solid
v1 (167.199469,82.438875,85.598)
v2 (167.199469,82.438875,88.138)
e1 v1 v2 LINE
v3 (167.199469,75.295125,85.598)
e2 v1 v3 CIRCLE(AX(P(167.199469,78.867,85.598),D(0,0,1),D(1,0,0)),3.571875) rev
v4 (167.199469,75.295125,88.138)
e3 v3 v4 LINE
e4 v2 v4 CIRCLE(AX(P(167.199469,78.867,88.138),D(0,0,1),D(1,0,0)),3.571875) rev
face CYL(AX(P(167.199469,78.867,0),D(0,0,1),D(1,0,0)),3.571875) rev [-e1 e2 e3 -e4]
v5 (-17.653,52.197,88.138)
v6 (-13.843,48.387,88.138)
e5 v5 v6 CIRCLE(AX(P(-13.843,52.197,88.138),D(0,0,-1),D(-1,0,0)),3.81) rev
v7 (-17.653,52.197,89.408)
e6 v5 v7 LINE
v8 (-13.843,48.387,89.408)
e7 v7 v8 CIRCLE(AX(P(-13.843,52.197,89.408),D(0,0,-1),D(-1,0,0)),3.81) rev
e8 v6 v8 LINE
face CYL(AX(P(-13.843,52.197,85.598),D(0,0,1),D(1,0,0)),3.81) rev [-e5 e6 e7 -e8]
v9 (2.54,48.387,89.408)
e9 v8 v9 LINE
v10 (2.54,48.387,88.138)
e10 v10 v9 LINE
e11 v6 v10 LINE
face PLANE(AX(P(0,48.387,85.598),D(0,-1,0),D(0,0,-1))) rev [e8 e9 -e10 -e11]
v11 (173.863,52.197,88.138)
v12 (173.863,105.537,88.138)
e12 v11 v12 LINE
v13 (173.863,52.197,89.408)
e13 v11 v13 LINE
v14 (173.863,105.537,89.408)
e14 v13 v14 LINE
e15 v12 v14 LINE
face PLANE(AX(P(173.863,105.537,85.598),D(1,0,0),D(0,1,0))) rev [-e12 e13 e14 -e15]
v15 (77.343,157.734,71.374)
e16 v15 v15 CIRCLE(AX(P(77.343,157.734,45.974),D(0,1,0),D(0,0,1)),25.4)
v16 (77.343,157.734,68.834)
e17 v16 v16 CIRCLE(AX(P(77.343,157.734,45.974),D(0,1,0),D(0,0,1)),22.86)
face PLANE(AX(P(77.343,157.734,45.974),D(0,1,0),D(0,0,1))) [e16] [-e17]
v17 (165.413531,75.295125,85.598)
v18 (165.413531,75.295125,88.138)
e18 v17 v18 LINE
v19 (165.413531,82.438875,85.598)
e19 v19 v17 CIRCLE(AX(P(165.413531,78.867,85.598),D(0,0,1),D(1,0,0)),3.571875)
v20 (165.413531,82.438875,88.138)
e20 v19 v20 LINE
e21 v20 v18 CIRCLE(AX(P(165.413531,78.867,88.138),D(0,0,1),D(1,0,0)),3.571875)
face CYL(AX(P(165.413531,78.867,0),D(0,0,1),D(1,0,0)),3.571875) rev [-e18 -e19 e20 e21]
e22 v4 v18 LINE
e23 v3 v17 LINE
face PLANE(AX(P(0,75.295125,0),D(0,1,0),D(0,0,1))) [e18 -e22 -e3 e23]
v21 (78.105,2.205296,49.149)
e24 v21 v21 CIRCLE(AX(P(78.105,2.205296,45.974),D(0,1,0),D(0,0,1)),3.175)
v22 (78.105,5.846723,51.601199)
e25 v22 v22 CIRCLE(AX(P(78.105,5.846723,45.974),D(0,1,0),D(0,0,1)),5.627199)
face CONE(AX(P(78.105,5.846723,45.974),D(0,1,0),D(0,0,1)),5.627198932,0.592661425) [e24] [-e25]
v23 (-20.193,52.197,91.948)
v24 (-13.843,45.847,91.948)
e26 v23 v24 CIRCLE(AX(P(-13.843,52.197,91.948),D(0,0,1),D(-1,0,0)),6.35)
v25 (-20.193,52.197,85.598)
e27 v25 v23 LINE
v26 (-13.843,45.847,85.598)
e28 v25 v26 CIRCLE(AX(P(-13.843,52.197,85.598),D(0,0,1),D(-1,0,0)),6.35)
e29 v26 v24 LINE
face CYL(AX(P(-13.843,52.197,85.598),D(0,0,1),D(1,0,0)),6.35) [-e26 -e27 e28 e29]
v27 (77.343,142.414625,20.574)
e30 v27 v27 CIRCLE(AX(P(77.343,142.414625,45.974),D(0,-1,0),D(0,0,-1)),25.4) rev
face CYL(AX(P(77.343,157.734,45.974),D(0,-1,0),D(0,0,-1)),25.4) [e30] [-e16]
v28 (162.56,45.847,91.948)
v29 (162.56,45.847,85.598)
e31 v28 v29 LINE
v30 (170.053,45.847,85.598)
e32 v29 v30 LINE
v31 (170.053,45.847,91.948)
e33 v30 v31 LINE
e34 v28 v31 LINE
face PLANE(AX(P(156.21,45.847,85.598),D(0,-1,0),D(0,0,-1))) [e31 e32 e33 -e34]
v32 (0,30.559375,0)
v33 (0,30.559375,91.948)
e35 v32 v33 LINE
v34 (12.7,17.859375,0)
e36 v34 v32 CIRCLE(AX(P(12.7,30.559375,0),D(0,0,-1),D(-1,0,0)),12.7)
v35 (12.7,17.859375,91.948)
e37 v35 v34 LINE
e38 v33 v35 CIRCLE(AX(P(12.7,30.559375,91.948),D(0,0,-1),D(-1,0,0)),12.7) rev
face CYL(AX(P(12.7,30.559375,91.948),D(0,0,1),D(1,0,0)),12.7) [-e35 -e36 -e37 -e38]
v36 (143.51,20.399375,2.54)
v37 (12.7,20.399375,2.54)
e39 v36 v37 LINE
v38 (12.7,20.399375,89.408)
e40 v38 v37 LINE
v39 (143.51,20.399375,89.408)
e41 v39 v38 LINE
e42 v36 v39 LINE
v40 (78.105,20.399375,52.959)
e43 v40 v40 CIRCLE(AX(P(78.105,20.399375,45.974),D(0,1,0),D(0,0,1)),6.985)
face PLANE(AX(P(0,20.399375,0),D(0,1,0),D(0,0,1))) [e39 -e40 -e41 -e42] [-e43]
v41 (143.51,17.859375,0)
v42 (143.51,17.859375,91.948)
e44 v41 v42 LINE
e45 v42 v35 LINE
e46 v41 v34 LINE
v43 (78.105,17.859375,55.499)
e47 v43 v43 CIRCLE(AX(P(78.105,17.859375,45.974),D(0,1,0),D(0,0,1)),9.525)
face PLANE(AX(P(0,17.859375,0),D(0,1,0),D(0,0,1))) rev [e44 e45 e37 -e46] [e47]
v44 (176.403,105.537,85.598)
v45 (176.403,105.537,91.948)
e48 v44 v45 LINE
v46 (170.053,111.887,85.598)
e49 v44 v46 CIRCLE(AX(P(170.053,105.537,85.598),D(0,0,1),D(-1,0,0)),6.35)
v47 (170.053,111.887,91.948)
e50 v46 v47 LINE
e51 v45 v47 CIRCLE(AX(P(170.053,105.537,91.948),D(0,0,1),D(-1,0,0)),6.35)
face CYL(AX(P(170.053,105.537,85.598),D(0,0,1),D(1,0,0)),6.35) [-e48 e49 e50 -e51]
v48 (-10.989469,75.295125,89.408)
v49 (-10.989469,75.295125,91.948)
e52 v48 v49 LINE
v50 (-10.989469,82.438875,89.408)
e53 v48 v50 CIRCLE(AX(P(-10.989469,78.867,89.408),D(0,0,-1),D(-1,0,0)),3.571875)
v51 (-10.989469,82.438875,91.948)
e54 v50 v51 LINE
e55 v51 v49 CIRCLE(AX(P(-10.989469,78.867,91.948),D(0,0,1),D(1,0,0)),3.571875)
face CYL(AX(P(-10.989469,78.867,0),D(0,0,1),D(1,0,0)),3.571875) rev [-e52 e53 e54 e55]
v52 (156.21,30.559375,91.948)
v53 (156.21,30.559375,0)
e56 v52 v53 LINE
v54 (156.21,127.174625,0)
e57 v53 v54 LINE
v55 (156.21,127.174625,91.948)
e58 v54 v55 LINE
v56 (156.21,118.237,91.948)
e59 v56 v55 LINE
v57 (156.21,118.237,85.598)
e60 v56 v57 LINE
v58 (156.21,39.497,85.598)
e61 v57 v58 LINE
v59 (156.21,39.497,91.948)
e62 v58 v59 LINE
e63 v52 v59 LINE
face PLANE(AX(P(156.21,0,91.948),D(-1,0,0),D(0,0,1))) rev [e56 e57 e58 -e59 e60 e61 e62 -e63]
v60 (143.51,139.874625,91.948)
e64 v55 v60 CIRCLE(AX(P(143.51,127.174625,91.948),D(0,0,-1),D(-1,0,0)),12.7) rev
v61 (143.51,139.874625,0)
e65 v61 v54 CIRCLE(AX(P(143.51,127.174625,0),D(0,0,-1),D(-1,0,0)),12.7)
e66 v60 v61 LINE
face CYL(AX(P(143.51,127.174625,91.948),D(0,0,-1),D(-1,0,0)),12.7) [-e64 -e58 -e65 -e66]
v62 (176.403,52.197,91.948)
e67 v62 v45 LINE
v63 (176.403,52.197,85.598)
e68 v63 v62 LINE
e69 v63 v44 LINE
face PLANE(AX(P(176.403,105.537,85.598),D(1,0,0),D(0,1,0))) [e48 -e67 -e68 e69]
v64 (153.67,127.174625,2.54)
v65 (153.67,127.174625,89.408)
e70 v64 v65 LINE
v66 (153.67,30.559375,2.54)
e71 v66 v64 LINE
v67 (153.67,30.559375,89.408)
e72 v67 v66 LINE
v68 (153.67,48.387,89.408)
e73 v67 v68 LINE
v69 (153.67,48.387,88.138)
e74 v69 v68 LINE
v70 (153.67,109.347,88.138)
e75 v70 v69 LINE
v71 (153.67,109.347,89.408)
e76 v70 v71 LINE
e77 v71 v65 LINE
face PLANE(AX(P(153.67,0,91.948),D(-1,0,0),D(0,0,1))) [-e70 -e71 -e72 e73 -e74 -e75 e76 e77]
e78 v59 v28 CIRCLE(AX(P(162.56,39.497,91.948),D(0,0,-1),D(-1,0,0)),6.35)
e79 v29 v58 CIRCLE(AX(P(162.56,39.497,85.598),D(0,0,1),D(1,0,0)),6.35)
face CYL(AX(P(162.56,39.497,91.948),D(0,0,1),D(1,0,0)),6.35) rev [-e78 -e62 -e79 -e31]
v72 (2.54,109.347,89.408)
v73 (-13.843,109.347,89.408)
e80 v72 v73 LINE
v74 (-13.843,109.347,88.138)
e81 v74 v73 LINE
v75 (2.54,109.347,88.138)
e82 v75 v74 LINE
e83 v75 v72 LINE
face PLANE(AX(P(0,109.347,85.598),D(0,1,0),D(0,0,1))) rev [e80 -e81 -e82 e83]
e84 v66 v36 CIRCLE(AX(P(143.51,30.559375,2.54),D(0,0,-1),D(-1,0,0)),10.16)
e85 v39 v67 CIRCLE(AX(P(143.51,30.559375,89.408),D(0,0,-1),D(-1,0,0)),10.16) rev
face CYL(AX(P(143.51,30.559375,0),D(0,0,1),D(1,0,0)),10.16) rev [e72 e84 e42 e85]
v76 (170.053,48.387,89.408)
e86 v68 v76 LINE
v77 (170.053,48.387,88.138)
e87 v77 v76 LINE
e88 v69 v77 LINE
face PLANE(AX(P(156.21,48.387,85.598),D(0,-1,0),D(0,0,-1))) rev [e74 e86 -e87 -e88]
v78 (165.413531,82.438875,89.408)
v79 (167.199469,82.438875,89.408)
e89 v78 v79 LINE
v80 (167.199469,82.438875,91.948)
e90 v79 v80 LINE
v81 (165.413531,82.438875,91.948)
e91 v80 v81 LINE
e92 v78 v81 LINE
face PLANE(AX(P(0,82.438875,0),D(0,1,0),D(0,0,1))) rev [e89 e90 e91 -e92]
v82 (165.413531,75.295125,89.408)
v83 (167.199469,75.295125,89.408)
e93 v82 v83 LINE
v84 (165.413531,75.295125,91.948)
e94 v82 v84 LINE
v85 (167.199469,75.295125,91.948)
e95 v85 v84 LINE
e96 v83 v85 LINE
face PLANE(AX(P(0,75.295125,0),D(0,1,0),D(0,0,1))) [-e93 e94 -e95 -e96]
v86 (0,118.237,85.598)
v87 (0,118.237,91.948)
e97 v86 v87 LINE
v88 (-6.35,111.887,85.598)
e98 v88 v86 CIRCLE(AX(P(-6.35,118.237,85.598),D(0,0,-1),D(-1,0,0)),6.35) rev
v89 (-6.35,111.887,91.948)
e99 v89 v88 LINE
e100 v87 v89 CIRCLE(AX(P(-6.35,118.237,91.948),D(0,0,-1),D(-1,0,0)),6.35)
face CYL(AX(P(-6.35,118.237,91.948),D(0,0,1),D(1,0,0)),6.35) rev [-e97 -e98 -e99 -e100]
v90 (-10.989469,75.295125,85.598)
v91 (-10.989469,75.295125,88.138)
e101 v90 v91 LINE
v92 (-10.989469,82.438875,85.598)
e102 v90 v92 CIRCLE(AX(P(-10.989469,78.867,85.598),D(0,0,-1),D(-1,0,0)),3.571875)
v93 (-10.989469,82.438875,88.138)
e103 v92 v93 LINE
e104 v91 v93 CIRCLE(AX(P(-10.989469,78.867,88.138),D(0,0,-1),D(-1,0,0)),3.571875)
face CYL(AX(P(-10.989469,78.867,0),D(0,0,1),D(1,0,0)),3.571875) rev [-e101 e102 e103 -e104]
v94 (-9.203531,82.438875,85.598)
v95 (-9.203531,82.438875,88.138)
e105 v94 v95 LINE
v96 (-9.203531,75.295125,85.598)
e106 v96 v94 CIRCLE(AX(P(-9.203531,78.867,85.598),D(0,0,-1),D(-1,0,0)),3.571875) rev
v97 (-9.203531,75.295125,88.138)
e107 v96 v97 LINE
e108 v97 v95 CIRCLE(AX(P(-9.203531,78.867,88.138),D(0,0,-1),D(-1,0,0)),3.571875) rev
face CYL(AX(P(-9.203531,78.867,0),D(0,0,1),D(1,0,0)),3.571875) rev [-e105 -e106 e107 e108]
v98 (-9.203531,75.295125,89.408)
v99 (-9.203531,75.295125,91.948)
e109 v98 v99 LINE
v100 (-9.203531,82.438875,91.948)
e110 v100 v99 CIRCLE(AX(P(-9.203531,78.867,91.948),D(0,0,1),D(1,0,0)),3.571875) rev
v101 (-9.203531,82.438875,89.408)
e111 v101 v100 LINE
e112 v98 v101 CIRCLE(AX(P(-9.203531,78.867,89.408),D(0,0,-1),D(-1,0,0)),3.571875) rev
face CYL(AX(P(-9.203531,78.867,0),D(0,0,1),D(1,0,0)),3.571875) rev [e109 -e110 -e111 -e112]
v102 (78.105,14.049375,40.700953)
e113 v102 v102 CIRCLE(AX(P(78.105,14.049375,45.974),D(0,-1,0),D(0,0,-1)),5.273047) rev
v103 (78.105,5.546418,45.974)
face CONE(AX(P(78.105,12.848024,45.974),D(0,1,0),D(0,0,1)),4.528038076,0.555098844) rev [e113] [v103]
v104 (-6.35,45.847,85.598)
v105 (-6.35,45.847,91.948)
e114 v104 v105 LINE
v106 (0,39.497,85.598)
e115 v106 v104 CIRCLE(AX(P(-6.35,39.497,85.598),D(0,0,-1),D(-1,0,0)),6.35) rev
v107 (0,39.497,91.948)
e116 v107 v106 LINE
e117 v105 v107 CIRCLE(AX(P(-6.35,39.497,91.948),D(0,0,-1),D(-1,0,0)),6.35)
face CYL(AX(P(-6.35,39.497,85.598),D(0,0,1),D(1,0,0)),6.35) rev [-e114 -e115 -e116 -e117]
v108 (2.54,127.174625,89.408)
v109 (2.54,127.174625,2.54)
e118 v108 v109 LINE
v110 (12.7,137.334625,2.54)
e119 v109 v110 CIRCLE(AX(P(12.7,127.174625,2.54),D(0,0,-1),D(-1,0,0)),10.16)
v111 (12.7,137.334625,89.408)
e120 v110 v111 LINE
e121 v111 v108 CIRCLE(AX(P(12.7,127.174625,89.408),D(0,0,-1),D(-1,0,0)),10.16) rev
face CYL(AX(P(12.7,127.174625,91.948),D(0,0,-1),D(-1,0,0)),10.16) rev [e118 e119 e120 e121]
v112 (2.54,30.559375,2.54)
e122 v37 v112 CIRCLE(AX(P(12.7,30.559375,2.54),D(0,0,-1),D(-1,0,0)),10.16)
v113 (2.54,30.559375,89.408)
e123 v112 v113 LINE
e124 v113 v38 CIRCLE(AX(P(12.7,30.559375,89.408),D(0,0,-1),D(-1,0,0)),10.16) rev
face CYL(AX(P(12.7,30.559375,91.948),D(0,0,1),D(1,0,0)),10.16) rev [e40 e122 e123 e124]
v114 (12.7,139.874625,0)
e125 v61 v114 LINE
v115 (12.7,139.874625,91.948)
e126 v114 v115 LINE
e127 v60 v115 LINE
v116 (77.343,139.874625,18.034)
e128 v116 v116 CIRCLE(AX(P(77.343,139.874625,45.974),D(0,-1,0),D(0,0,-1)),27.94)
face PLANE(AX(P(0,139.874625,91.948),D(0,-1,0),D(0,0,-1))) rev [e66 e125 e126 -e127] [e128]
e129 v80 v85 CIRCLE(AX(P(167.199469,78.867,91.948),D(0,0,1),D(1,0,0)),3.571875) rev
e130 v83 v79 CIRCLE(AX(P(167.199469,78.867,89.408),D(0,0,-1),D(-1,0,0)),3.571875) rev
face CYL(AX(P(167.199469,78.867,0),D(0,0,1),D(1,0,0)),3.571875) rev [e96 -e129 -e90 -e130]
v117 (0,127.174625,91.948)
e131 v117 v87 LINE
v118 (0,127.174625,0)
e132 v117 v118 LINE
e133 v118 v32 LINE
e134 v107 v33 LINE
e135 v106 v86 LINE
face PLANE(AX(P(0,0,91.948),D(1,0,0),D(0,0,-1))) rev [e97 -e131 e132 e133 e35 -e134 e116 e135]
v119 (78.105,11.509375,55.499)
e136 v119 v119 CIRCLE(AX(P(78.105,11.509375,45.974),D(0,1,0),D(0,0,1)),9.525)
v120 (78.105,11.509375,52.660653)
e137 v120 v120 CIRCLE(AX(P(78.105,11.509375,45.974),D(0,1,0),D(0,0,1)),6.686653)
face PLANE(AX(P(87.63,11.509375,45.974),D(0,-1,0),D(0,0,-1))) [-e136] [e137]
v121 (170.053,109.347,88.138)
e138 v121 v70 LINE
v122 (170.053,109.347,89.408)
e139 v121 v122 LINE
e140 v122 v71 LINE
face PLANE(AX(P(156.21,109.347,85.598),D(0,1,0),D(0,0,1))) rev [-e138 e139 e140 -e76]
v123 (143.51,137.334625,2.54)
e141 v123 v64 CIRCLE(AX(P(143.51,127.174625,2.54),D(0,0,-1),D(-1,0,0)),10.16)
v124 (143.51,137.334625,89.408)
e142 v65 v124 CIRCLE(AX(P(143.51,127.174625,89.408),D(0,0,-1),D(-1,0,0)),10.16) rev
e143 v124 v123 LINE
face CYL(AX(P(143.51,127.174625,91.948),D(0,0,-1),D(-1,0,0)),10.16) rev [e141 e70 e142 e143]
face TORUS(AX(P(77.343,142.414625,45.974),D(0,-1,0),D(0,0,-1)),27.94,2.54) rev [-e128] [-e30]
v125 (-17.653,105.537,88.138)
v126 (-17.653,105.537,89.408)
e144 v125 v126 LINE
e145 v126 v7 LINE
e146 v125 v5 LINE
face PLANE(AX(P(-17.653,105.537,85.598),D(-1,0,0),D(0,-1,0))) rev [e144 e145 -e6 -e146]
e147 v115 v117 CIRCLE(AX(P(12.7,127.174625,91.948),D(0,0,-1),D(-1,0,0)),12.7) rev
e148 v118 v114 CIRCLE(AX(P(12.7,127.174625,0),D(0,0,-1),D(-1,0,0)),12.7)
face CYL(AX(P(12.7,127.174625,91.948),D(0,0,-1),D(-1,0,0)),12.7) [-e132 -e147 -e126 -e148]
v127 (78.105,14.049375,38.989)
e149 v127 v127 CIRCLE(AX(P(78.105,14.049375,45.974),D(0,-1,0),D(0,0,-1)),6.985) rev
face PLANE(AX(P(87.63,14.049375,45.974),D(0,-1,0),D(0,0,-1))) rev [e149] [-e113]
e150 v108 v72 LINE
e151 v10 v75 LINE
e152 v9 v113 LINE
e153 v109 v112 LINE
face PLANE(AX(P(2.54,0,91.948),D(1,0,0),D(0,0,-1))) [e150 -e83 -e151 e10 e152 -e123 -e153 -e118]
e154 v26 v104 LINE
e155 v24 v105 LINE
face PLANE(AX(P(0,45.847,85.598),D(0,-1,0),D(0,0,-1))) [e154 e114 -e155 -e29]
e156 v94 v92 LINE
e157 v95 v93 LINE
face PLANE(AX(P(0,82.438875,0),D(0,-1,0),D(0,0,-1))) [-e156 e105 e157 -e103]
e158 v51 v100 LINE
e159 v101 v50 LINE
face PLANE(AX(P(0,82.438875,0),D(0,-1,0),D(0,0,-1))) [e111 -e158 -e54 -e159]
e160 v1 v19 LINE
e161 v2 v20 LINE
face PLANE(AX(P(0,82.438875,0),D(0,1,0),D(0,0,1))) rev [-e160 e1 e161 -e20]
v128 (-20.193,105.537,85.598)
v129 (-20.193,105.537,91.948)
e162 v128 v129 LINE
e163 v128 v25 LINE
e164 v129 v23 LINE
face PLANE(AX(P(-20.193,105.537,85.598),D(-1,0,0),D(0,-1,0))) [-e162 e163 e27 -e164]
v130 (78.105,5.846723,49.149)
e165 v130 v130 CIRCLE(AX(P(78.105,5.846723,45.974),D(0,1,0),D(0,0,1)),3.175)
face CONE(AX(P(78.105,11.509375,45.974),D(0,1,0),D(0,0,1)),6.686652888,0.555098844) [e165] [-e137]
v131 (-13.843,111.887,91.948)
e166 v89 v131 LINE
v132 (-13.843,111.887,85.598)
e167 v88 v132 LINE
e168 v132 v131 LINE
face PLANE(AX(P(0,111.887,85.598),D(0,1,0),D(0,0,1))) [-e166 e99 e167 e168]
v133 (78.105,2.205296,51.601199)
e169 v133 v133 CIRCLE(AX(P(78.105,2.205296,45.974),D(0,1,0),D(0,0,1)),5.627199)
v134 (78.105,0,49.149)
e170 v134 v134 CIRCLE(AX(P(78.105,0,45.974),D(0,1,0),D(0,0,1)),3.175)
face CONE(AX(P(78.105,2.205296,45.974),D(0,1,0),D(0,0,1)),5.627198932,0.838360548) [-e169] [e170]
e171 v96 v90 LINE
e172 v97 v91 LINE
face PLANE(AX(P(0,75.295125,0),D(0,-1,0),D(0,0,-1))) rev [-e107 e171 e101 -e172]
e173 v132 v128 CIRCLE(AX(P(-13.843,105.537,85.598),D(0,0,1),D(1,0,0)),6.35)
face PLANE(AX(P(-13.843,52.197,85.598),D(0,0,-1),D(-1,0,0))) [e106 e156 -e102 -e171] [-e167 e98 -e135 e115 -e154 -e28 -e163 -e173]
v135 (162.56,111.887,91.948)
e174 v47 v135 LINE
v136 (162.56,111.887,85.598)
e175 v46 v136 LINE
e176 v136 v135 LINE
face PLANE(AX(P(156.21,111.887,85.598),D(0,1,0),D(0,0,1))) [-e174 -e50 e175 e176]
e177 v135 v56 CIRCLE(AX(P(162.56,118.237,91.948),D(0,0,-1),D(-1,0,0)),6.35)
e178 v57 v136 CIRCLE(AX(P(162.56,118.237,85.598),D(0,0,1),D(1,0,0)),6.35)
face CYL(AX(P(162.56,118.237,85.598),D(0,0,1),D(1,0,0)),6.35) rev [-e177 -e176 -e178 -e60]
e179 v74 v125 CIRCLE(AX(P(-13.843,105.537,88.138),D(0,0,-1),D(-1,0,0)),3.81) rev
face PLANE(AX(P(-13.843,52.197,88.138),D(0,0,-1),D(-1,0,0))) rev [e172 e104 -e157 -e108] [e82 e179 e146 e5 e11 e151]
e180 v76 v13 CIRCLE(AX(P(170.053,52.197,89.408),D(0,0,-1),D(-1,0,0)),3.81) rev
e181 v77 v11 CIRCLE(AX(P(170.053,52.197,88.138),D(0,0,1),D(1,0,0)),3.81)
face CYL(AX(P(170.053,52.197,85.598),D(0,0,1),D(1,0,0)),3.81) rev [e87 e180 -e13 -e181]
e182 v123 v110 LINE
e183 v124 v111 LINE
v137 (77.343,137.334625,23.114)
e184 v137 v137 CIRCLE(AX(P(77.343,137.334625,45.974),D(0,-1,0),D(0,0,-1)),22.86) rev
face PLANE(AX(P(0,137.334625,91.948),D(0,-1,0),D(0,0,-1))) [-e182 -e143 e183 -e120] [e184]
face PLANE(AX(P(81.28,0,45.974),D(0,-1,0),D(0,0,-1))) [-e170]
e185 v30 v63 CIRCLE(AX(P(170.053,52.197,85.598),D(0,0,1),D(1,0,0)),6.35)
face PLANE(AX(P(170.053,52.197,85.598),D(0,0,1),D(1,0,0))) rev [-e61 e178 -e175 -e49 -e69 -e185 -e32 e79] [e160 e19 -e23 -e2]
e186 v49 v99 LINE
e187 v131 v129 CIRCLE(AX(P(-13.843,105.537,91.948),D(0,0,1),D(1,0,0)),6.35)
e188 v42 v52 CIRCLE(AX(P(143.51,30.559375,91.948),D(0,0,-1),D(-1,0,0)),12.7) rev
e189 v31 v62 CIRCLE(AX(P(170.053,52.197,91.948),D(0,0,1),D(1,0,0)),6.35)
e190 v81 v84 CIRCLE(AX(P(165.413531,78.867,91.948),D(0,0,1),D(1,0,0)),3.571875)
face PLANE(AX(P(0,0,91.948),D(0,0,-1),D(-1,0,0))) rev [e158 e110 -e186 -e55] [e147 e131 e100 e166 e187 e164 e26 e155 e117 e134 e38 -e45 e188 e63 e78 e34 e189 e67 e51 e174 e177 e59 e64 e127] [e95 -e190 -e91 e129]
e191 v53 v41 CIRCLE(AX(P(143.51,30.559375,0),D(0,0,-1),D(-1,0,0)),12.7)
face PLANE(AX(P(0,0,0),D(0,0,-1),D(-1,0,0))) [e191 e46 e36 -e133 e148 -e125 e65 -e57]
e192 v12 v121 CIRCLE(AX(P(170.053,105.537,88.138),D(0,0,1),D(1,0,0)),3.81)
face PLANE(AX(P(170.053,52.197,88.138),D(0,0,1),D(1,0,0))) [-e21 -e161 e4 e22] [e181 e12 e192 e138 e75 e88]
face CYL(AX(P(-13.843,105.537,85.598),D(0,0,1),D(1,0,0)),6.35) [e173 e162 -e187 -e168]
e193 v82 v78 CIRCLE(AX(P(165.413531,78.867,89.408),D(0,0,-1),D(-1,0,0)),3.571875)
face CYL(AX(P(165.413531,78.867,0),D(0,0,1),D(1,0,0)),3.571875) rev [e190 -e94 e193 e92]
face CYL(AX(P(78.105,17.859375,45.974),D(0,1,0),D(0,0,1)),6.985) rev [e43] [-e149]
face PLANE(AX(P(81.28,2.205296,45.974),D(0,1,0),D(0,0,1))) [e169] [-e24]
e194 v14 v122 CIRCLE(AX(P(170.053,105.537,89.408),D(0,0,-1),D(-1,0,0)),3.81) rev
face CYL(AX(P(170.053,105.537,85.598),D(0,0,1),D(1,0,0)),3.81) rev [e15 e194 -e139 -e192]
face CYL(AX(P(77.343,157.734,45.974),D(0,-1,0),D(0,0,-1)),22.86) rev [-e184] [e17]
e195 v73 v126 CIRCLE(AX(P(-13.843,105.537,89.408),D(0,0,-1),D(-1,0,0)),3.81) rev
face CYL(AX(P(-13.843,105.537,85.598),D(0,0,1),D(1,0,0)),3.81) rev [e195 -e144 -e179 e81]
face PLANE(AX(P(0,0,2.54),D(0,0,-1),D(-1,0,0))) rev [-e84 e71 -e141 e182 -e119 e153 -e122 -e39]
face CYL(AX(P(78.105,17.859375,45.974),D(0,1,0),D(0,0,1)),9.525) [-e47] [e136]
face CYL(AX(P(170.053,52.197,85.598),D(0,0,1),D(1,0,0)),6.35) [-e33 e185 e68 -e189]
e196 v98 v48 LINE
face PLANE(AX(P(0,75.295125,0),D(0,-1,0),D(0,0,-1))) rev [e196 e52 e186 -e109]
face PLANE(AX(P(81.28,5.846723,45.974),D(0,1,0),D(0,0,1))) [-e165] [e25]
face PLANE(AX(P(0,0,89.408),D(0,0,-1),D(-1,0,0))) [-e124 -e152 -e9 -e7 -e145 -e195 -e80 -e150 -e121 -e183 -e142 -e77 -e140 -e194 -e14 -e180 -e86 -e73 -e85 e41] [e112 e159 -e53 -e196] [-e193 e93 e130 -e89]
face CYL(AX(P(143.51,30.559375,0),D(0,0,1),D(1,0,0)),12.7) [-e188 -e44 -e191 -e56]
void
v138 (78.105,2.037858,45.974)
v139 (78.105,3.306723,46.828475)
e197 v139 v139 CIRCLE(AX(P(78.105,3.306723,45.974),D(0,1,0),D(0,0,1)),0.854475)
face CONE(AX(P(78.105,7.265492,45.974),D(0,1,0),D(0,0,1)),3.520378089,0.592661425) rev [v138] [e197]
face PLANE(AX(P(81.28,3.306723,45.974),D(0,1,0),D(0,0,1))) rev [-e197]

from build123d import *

# Parameters (mm, degrees)
SKETCH1_W           = 156.21
SKETCH1_H           = 139.874625
BOSS_EXTRUDE1_DEPTH = 91.948
BOSS_EXTRUDE2_DEPTH = 6.35
SKETCH4_R           = 25.4
BOSS_EXTRUDE3_DEPTH = 17.859375
SKETCH5_W           = 156.21
SKETCH5_H           = 17.859375
CUT_EXTRUDE2_DEPTH  = 254.874905946
FILLET2_R           = 12.7
SHELL3_START        = 2.54
SHELL3_DEPTH        = 86.868
SHELL3_START_2      = 88.138
SHELL3_2_DEPTH      = 1.27
SHELL3_START_3      = 137.334625
SHELL3_3_OUTLINE_R  = 22.86
SHELL3_3_DEPTH      = 20.399375
FILLET3_R           = 6.35
SKETCH9_W           = 1.7859375
SKETCH9_H           = 7.14375
CUT_EXTRUDE3_DEPTH  = 254.874905946
FILLET4_R           = 2.54


with BuildPart() as part:
    # Sketch1 → Boss-Extrude1 (new body)
    with BuildSketch(Plane.XY):
        with Locations((78.105, 69.9373125)):
            Rectangle(SKETCH1_W, SKETCH1_H)
    extrude(amount=BOSS_EXTRUDE1_DEPTH)

    # Sketch3 → Boss-Extrude2 (add)
    with BuildSketch(Plane.XY.offset(91.948)):
        with BuildLine():
            Line((0, 111.887), (-13.843, 111.887))
            ThreePointArc((-13.843, 111.887), (-18.333128061, 110.027128061), (-20.193, 105.537))
            Line((-20.193, 105.537), (-20.193, 52.197))
            ThreePointArc((-20.193, 52.197), (-18.333128061, 47.706871939), (-13.843, 45.847))
            Line((-13.843, 45.847), (0, 45.847))
            Line((0, 45.847), (0, 111.887))
        make_face()
        with BuildLine():
            Line((156.21, 111.887), (170.053, 111.887))
            ThreePointArc((170.053, 111.887), (174.543128061, 110.027128061), (176.403, 105.537))
            Line((176.403, 105.537), (176.403, 52.197))
            ThreePointArc((176.403, 52.197), (174.543128061, 47.706871939), (170.053, 45.847))
            Line((170.053, 45.847), (156.21, 45.847))
            Line((156.21, 45.847), (156.21, 111.887))
        make_face()
    extrude(amount=-BOSS_EXTRUDE2_DEPTH)

    # Sketch4 → Boss-Extrude3 (add)
    with BuildSketch(Plane(origin=(0, 139.874625, 0), x_dir=(1, 0, 0), z_dir=(0, 1, 0))):
        with Locations(Location((77.343, -45.974, 0), (0, 0, 270))):
            Circle(SKETCH4_R)
    extrude(amount=BOSS_EXTRUDE3_DEPTH)

    # Sketch5 → Cut-Extrude2 (cut, through all)
    with BuildSketch(Plane.XY.offset(91.948)):
        with Locations((78.105, 8.9296875)):
            Rectangle(SKETCH5_W, SKETCH5_H)
    extrude(amount=-CUT_EXTRUDE2_DEPTH, mode=Mode.SUBTRACT)

    # Sketch6 → Revolve1 (revolve)
    with BuildSketch(Plane(origin=(0, 0, 45.974), x_dir=(-1, 0, 0), z_dir=(0, 0, -1)), mode=Mode.PRIVATE) as revolve1_sk:
        Polygon((-78.105, 17.859375), (-78.105, 0), (-81.28, 0), (-83.732198932, 2.205295997), (-81.28, 2.205295997), (-83.732198932, 5.846722634), (-81.28, 5.846722634), (-84.791652888, 11.509375), (-87.63, 11.509375), (-87.63, 17.859375), align=None)
    revolve(revolve1_sk.sketch.rotate(Axis((78.105, 17.859375, 45.974), (0, -1, 0)), 90), axis=Axis((78.105, 17.859375, 45.974), (0, -1, 0)))

    # Fillet2
    fillet2_edges = [part.edges().sort_by_distance(p)[0] for p in [
        (0, 17.859375, 45.974),
        (156.21, 17.859375, 45.974),
        (0, 139.874625, 45.974),
        (156.21, 139.874625, 45.974),
    ]]
    fillet(fillet2_edges, radius=FILLET2_R)

    # Shell3: read off the stored shape, not the designer's step
    # Shell3 outline → Shell3 (cut)
    with BuildSketch(Plane.XY.offset(SHELL3_START)):
        with BuildLine():
            ThreePointArc((12.7, 137.334625), (5.515795103, 134.358829897), (2.54, 127.174625))
            Line((2.54, 127.174625), (2.54, 30.559375))
            ThreePointArc((2.54, 30.559375), (5.515795103, 23.375170103), (12.7, 20.399375))
            Line((12.7, 20.399375), (143.51, 20.399375))
            ThreePointArc((143.51, 20.399375), (150.694204897, 23.375170103), (153.67, 30.559375))
            Line((153.67, 30.559375), (153.67, 127.174625))
            ThreePointArc((153.67, 127.174625), (150.694204897, 134.358829897), (143.51, 137.334625))
            Line((143.51, 137.334625), (12.7, 137.334625))
        make_face()
    extrude(amount=SHELL3_DEPTH, mode=Mode.SUBTRACT)

    # Shell3 2 outline → Shell3 2 (cut)
    with BuildSketch(Plane.XY.offset(SHELL3_START_2)):
        with BuildLine():
            Line((2.54, 48.387), (2.54, 109.347))
            Line((2.54, 109.347), (-13.843, 109.347))
            ThreePointArc((-13.843, 109.347), (-16.537076836, 108.231076836), (-17.653, 105.537))
            Line((-17.653, 105.537), (-17.653, 52.197))
            ThreePointArc((-17.653, 52.197), (-16.537076836, 49.502923164), (-13.843, 48.387))
            Line((-13.843, 48.387), (2.54, 48.387))
        make_face()
        with BuildLine():
            Line((170.053, 109.347), (153.67, 109.347))
            Line((153.67, 109.347), (153.67, 48.387))
            Line((153.67, 48.387), (170.053, 48.387))
            ThreePointArc((170.053, 48.387), (172.747076836, 49.502923164), (173.863, 52.197))
            Line((173.863, 52.197), (173.863, 105.537))
            ThreePointArc((173.863, 105.537), (172.747076836, 108.231076836), (170.053, 109.347))
        make_face()
    extrude(amount=SHELL3_2_DEPTH, mode=Mode.SUBTRACT)

    # Shell3 3 outline → Shell3 3 (cut)
    with BuildSketch(Plane(origin=(0, 0, 0), x_dir=(1, 0, 0), z_dir=(0, 1, 0)).offset(SHELL3_START_3)):
        with Locations((77.343, -45.974)):
            Circle(SHELL3_3_OUTLINE_R)
    extrude(amount=SHELL3_3_DEPTH, mode=Mode.SUBTRACT)

    # Shell3 4 outline → Shell3 4 (revolve, cut)
    with BuildSketch(Plane(origin=(78.105, 0, 45.974), x_dir=(1, 0, 0), z_dir=(0, 0, 1))):
        Polygon((0, 20.399375), (0, 5.546418432), (5.273046986, 14.049375), (6.985, 14.049375), (6.985, 20.399375), align=None)
        Polygon((0.854475277, 3.306722634), (0, 3.306722634), (0, 2.037857783), align=None)
    revolve(axis=Axis((78.105, 0, 45.974), (0, 1, 0)), mode=Mode.SUBTRACT)

    # Fillet3
    fillet3_edges = [part.edges().sort_by_distance(p)[0] for p in [
        (0, 111.887, 88.773),
        (0, 45.847, 88.773),
        (156.21, 45.847, 88.773),
        (156.21, 111.887, 88.773),
    ]]
    fillet(fillet3_edges, radius=FILLET3_R)

    # Sketch9 → Cut-Extrude3 (cut, through all)
    with BuildSketch(Plane.XY.offset(91.948)):
        with BuildLine():
            Line((-10.98946875, 82.438875), (-10.98946875, 75.295125))
            ThreePointArc((-10.98946875, 75.295125), (-14.56134375, 78.867), (-10.98946875, 82.438875))
        make_face()
        with BuildLine():
            ThreePointArc((-9.20353125, 82.438875), (-5.63165625, 78.867), (-9.20353125, 75.295125))
            Line((-9.20353125, 75.295125), (-9.20353125, 82.438875))
        make_face()
        with Locations((-10.0965, 78.867)):
            Rectangle(SKETCH9_W, SKETCH9_H)
        with BuildLine():
            Line((165.41353125, 82.438875), (165.41353125, 75.295125))
            ThreePointArc((165.41353125, 75.295125), (161.84165625, 78.867), (165.41353125, 82.438875))
        make_face()
        with BuildLine():
            ThreePointArc((167.19946875, 82.438875), (170.77134375, 78.867), (167.19946875, 75.295125))
            Line((167.19946875, 75.295125), (167.19946875, 82.438875))
        make_face()
        with Locations((166.3065, 78.867)):
            Rectangle(SKETCH9_W, SKETCH9_H)
    extrude(amount=-CUT_EXTRUDE3_DEPTH, mode=Mode.SUBTRACT)

    # Fillet4
    fillet4_edges = [part.edges().sort_by_distance(p)[0] for p in [
        (77.343, 139.874625, 20.574),
    ]]
    fillet(fillet4_edges, radius=FILLET4_R)


solid = part.part
